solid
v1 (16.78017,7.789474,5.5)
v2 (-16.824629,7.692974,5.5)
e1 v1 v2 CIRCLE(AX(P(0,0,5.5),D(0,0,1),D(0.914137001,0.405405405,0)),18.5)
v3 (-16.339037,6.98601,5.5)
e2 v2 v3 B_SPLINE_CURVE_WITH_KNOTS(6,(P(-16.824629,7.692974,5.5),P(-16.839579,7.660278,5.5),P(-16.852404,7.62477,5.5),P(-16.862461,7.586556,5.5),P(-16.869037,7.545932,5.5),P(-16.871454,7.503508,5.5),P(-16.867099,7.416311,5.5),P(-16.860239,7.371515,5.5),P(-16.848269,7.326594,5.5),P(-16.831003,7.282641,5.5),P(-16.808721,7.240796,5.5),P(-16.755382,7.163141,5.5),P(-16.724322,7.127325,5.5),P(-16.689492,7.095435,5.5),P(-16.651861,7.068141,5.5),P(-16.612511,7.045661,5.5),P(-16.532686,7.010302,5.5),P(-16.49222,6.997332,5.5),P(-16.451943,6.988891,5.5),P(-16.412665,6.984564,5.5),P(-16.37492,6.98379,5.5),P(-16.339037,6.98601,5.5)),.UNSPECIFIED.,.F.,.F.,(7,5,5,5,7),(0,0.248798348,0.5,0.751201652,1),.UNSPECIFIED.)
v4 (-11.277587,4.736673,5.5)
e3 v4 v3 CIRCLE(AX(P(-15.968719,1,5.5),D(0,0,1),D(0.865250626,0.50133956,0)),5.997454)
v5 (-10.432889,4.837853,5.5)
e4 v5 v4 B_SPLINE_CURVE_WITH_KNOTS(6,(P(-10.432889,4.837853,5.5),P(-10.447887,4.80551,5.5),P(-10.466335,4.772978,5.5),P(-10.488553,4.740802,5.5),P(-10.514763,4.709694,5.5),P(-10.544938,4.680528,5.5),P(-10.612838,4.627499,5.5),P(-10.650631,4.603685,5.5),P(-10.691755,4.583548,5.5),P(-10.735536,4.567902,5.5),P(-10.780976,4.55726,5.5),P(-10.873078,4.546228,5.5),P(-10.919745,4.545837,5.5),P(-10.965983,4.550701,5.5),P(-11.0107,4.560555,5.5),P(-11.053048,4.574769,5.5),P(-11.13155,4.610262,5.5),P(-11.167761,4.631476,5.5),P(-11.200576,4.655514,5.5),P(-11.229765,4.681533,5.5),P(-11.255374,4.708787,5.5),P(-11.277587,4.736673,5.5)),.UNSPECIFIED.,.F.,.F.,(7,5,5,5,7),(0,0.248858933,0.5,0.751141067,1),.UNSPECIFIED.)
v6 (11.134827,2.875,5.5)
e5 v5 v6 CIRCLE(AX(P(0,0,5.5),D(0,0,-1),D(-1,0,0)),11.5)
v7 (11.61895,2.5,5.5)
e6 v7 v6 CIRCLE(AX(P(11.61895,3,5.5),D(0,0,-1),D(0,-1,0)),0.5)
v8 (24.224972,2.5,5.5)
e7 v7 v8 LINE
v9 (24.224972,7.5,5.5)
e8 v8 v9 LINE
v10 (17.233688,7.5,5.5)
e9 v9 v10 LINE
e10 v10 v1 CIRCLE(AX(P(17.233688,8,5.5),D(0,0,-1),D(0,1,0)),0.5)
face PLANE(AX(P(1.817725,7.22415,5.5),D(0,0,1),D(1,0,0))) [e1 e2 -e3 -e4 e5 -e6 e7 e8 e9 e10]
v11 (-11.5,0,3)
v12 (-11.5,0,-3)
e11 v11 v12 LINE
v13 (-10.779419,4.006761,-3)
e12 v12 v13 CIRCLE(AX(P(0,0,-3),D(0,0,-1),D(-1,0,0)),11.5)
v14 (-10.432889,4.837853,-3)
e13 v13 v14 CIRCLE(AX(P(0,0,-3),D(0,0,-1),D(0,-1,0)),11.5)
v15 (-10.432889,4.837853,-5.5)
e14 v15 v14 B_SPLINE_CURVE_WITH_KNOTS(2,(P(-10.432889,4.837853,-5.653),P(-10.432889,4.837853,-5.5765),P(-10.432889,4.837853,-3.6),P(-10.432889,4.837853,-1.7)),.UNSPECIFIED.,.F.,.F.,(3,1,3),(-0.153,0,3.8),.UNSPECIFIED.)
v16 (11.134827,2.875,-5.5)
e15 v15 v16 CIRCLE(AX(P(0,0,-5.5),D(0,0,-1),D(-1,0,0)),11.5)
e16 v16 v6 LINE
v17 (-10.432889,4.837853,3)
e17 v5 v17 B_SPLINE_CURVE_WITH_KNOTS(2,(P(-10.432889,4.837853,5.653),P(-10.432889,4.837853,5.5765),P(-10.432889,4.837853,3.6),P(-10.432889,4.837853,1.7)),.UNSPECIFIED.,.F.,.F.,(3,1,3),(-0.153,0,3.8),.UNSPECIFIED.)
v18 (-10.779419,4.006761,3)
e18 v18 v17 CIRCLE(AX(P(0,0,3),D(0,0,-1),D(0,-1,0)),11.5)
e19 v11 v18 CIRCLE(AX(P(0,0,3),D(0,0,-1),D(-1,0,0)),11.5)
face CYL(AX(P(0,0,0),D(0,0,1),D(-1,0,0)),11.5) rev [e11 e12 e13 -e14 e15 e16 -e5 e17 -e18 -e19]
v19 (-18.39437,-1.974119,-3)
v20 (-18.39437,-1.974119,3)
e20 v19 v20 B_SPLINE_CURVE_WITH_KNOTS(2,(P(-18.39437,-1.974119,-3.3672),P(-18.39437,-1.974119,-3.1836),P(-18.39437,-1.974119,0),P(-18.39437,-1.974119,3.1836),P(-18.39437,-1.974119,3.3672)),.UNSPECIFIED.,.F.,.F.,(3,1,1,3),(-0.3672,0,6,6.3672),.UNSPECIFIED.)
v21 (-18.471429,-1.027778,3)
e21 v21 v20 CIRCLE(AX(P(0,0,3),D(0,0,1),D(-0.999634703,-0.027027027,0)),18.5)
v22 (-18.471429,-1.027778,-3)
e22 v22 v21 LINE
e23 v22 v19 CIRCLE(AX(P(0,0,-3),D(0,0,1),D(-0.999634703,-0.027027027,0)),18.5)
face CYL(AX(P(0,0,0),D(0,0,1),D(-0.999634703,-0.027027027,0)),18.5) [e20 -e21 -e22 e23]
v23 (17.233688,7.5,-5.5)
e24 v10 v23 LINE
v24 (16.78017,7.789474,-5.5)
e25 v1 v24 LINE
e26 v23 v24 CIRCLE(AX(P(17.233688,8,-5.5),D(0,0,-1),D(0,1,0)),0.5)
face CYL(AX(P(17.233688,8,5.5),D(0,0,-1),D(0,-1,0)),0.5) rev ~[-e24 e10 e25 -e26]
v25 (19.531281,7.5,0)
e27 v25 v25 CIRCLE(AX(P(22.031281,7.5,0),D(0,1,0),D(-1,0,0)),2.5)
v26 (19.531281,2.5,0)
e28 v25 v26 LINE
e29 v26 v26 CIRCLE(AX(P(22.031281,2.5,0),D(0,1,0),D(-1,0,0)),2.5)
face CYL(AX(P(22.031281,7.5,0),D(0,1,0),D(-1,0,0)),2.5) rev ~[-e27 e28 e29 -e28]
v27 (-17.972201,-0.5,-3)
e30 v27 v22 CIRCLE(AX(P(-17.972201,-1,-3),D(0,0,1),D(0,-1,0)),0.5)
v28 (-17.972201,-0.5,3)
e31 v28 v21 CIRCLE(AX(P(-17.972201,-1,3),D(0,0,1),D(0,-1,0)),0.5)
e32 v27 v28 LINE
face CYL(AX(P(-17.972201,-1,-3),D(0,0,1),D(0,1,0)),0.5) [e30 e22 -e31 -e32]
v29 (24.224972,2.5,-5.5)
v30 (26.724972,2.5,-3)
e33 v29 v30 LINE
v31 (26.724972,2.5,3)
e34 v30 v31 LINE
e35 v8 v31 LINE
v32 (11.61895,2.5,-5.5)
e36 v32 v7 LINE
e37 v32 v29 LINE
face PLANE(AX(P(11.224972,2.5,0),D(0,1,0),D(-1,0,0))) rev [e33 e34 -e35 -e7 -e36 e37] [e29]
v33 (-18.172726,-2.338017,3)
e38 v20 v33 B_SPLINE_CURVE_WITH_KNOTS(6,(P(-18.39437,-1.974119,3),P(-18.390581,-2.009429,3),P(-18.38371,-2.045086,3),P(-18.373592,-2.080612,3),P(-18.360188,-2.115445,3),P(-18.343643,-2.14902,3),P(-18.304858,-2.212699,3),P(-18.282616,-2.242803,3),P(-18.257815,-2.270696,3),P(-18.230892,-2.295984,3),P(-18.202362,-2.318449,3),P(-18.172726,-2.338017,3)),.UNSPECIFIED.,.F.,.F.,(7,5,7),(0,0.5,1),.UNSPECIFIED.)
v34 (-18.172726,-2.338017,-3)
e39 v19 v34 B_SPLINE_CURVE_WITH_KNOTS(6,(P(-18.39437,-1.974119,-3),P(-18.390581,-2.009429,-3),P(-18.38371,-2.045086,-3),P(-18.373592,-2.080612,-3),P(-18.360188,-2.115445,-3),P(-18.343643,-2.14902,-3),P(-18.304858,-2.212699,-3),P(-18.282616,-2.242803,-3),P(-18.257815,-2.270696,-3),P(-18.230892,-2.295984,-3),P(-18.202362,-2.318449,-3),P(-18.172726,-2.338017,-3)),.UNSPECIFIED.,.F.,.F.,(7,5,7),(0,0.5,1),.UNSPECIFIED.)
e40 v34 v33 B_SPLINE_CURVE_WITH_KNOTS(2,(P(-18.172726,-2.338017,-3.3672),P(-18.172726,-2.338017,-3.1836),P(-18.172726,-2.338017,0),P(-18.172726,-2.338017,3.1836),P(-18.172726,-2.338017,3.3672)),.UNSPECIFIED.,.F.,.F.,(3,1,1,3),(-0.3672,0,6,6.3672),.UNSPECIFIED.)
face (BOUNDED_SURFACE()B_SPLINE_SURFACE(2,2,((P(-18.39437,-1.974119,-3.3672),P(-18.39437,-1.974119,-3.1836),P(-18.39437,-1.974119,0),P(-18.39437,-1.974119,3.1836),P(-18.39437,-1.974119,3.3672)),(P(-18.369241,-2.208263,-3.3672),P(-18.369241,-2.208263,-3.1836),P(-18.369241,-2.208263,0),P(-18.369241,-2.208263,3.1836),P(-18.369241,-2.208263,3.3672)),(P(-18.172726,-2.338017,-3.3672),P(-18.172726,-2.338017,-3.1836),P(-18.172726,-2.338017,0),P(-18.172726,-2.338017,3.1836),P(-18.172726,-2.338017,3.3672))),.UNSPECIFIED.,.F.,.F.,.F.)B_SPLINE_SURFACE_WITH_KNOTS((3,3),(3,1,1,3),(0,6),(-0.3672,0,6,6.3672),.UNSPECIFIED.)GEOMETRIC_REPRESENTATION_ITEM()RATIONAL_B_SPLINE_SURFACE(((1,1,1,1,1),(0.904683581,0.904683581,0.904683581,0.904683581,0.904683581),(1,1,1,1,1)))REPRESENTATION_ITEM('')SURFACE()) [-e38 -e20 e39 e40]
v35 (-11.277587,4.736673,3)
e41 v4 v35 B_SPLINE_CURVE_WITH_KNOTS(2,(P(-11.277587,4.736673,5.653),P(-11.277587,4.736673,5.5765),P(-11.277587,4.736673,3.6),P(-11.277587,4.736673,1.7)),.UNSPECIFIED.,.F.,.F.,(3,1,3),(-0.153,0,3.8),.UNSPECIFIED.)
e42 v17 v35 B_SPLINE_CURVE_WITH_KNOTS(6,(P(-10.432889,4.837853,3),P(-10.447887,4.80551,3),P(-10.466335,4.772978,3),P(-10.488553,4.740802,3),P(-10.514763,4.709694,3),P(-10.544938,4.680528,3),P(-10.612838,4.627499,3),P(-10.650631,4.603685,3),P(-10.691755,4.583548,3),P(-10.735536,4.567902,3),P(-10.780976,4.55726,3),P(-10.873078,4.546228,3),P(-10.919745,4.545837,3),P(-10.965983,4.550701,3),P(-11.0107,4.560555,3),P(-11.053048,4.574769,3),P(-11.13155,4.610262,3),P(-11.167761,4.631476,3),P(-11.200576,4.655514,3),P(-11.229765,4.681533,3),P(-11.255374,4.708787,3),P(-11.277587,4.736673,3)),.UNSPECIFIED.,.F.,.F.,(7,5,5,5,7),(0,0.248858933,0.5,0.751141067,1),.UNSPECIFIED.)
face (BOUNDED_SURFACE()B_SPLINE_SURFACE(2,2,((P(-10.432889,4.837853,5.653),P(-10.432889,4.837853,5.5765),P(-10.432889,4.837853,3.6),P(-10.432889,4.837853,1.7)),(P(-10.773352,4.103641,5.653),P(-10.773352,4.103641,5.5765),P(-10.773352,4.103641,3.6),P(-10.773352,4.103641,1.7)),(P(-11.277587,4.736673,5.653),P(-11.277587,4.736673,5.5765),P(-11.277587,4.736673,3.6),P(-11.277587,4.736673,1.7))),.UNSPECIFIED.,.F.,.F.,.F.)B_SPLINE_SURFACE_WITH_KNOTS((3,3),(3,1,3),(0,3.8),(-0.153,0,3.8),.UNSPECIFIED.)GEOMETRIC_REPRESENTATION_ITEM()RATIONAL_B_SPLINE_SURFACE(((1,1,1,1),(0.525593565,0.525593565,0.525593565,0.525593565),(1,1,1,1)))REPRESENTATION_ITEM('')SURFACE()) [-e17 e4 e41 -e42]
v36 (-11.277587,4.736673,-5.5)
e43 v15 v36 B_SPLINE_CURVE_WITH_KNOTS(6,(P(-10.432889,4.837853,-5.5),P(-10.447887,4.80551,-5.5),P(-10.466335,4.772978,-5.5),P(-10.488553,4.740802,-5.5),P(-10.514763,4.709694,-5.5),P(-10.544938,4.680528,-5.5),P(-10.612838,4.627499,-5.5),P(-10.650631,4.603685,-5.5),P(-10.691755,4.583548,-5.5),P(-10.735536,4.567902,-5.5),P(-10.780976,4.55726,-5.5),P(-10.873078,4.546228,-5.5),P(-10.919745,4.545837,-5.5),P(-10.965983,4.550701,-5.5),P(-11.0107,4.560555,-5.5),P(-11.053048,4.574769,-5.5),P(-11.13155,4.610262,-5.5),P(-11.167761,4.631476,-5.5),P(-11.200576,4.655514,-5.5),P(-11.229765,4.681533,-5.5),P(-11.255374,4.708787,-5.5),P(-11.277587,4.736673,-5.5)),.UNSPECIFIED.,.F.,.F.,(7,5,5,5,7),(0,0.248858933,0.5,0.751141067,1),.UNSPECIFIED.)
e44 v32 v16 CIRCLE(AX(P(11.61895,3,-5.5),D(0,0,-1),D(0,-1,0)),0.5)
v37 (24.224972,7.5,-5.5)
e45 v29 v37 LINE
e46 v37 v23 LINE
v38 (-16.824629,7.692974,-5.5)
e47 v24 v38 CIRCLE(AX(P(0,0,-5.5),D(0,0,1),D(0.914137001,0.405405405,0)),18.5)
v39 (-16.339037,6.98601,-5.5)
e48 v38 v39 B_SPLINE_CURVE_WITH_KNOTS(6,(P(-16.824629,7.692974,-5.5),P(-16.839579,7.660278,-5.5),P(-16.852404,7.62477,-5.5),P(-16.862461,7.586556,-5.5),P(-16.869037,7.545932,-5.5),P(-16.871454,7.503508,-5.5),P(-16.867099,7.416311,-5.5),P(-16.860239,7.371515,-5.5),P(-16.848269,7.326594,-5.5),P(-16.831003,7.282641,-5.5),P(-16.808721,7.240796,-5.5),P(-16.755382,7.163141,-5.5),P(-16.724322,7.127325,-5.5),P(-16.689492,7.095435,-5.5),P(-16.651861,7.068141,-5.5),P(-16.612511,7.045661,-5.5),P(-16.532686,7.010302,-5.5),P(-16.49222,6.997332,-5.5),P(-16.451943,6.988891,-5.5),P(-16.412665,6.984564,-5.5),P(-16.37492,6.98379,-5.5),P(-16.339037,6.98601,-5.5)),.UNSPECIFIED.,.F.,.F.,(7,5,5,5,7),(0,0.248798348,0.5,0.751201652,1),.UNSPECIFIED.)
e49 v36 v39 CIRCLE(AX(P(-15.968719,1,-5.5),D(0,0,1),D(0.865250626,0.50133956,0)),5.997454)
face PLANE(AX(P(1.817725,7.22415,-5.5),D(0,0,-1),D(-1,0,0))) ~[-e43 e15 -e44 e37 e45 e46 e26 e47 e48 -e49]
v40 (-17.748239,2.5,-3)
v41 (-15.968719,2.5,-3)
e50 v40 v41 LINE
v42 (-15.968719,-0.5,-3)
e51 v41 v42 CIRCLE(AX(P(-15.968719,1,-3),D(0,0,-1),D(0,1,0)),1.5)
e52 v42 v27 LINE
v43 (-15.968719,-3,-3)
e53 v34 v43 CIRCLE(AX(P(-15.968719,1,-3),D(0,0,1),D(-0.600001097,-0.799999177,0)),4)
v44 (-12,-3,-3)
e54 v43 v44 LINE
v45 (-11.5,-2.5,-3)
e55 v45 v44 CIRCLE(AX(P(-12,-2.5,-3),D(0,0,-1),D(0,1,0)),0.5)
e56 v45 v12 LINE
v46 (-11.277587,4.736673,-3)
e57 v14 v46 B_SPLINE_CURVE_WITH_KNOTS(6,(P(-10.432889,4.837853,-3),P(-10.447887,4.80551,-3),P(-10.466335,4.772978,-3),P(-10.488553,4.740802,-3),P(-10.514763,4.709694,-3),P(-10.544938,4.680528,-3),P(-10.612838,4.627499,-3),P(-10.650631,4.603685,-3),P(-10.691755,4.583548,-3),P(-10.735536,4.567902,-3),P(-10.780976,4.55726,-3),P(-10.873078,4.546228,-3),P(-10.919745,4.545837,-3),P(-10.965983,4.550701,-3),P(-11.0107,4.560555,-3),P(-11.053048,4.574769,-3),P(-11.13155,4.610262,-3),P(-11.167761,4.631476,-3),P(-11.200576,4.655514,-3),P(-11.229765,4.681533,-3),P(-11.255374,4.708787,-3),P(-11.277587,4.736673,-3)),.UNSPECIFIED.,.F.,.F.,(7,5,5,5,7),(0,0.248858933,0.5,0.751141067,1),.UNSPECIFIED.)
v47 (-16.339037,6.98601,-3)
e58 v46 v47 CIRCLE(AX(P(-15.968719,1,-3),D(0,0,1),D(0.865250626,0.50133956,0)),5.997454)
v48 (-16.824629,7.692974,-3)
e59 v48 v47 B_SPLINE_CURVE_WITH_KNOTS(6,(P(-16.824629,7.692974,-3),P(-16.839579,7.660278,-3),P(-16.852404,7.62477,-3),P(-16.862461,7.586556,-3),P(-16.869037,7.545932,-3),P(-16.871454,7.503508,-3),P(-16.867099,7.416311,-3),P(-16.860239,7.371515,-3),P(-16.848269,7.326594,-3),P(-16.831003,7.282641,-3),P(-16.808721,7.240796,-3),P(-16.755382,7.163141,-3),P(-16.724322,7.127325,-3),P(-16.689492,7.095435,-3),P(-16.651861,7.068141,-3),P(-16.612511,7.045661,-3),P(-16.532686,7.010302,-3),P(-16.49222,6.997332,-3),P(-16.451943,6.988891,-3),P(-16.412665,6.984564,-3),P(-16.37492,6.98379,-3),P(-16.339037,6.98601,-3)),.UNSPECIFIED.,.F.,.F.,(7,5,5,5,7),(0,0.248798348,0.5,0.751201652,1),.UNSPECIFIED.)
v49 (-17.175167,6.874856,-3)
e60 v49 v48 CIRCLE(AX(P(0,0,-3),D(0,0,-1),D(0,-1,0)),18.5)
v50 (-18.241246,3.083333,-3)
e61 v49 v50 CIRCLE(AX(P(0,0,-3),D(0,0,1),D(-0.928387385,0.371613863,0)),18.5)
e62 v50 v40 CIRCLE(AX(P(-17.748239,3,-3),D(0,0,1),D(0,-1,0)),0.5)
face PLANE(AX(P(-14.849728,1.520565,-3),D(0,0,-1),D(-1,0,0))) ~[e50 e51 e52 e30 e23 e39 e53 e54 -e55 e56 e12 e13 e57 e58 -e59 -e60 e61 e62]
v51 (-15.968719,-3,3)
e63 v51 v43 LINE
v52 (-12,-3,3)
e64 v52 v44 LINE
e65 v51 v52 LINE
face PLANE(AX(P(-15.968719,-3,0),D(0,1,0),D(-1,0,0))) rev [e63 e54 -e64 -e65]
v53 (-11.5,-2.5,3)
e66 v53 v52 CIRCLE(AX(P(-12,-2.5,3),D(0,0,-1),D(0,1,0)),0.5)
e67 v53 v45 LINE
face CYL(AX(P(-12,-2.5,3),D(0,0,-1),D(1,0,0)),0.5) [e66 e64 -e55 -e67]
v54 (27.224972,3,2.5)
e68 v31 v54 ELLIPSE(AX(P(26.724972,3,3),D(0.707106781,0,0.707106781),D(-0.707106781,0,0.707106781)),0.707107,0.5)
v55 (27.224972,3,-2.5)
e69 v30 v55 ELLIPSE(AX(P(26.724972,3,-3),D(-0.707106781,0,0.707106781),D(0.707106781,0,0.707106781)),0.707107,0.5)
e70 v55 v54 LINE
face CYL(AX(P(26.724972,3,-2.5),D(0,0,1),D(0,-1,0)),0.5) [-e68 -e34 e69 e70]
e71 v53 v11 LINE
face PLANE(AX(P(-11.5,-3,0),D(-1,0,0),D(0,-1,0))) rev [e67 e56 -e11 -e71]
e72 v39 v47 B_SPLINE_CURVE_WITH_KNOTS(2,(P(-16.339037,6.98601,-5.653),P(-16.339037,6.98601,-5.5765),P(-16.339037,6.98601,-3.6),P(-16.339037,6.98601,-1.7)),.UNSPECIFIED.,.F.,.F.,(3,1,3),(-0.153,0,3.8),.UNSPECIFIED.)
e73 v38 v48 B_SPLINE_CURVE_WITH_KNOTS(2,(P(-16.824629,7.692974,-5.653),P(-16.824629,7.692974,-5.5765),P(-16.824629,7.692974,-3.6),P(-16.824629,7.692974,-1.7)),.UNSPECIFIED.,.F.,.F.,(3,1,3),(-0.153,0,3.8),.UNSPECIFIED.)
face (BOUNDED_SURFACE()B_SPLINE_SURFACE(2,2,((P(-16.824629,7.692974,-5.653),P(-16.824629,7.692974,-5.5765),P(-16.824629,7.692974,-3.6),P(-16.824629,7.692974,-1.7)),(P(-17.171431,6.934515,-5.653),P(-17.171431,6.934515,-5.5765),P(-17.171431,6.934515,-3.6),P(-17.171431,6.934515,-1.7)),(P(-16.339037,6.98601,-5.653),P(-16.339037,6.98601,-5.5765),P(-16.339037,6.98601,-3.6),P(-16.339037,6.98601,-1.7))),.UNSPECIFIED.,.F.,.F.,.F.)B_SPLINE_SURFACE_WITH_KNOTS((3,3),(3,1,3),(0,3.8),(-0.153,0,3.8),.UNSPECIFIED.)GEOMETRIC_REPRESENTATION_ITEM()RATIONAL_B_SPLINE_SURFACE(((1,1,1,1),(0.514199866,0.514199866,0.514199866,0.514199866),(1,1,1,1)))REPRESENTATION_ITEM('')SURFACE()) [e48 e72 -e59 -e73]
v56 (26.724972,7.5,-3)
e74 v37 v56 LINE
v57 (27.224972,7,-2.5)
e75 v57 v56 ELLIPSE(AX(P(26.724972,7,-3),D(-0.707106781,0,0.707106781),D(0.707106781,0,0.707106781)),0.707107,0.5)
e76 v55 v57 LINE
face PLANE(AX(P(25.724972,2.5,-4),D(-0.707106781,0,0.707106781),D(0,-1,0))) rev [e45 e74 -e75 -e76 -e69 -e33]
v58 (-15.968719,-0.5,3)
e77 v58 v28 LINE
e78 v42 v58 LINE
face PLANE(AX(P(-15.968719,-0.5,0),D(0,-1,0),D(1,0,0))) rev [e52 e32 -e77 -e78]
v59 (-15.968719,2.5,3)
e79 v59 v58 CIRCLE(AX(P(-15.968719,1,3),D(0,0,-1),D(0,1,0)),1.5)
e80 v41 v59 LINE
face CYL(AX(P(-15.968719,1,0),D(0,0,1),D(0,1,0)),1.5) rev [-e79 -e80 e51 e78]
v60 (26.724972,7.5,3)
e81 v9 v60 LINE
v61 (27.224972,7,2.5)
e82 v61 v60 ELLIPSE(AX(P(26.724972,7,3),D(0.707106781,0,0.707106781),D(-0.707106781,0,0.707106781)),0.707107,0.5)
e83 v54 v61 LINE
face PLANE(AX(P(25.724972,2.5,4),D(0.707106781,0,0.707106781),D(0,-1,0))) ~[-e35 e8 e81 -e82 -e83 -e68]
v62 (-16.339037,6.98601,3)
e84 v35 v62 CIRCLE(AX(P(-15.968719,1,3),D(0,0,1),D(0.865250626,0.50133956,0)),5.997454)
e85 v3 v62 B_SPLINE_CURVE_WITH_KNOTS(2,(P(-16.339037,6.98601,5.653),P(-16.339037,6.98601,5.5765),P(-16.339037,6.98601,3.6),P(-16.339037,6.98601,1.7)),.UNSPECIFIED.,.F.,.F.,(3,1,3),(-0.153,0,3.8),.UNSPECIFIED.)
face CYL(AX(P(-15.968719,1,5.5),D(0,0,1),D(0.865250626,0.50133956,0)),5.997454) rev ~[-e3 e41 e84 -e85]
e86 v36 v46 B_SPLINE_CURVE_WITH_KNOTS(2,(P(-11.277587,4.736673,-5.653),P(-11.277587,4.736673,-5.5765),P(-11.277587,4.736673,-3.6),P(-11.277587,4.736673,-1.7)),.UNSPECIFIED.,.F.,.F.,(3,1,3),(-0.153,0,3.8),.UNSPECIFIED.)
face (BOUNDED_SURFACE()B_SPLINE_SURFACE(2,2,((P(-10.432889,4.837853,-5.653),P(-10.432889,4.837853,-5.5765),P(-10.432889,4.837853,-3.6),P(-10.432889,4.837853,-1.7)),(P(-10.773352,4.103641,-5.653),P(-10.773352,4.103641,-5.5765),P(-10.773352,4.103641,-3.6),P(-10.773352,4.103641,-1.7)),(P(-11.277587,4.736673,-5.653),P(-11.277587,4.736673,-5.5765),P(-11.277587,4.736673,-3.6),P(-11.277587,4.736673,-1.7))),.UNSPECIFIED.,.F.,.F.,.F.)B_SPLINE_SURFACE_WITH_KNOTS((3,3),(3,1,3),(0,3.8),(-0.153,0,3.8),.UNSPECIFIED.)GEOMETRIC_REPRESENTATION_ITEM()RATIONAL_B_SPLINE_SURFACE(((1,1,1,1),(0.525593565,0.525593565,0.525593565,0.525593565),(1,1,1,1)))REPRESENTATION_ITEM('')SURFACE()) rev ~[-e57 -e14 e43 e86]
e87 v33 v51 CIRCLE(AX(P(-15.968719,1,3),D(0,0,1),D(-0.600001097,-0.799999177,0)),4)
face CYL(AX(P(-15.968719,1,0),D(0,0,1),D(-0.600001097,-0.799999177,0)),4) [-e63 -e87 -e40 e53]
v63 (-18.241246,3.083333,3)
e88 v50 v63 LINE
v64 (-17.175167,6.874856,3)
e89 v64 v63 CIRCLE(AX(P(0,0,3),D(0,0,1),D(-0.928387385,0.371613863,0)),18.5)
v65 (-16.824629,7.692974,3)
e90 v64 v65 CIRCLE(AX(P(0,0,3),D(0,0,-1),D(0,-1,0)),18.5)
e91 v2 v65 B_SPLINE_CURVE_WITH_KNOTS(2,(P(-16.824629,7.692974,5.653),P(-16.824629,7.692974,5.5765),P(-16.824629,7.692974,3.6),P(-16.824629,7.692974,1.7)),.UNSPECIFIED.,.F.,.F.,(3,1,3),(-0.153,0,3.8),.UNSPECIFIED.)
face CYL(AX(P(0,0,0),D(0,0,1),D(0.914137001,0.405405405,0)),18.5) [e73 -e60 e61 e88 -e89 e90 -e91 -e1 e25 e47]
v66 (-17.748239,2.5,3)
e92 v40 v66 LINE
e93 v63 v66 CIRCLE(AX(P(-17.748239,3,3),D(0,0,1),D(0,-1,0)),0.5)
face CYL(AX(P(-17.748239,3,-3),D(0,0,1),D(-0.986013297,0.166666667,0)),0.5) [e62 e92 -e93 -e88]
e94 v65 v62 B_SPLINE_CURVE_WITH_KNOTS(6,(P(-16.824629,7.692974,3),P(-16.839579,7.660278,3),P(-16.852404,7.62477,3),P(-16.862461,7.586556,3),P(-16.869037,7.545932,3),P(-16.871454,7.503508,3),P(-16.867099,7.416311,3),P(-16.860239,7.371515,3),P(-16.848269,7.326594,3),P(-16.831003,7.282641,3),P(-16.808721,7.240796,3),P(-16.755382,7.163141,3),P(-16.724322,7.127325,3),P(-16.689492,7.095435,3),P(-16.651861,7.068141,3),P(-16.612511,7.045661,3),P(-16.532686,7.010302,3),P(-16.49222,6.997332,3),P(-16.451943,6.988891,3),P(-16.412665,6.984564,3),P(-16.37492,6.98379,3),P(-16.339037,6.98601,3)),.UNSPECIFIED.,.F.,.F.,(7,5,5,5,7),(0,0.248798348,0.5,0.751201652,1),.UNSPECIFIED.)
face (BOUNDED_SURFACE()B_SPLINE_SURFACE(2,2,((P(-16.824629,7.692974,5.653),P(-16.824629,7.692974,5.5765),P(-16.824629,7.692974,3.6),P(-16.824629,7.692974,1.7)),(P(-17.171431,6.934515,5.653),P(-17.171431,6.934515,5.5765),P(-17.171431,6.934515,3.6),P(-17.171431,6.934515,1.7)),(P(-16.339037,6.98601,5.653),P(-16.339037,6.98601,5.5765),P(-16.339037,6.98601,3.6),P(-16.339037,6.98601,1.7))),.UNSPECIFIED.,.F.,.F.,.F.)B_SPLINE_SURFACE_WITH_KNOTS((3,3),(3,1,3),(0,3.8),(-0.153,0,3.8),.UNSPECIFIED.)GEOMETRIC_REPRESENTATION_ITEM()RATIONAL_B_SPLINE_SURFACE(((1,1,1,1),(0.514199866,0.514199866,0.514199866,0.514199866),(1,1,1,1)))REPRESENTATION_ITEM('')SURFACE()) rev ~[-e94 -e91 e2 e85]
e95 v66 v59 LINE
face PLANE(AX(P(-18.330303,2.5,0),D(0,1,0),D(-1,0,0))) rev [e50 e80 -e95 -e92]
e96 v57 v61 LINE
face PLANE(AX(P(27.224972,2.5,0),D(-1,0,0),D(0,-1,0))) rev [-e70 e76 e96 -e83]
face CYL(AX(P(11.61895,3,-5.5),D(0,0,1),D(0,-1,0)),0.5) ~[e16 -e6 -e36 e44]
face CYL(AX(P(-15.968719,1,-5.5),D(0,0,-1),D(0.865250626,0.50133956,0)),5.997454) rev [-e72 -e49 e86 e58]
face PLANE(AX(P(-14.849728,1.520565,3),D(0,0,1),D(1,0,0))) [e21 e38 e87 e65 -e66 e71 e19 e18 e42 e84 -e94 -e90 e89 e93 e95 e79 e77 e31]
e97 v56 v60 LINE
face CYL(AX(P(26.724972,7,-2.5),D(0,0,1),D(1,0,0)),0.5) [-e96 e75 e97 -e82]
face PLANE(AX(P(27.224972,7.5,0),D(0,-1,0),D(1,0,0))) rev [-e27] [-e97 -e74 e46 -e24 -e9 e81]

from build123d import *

# Parameters (mm, degrees)
F1_DEPTH = 5.5
F3_DEPTH = 2.5
F5_R     = 2.5
F6_DEPTH = 5
F7_SIZE  = 3
F8_R     = 0.5


# Not quite as in the source:
# - a feature names something its author has since deleted; it is built from what else it names


with BuildPart() as f1:
    # F0 (on Top) → F1 (new body)
    with BuildSketch(Plane.XY):
        with BuildLine():
            ThreePointArc((-11.5, 0), (-1.2575412829, 11.4310362576), (11.2249721603, 2.5))
            Line((11.2249721603, 2.5), (27.2249721603, 2.5))
            Line((27.2249721603, 2.5), (27.2249721603, 7.5))
            Line((27.2249721603, 7.5), (16.9115345253, 7.5))
            ThreePointArc((16.9115345253, 7.5), (-2.5986969504, 18.3165710263), (-18.3303027798, 2.5))
            Line((-18.3303027798, 2.5), (-15.9687194227, 2.5))
            ThreePointArc((-15.9687194227, 2.5), (-14.4687194227, 1), (-15.9687194227, -0.5))
            Line((-15.9687194227, -0.5), (-18.4932420089, -0.5))
            ThreePointArc((-18.4932420089, -0.5), (-18.4505725724, -1.3514332211), (-18.3687238121, -2.1999967079))
            ThreePointArc((-18.3687238121, -2.1999967079), (-17.2336330893, -2.7947323247), (-15.9687194227, -3))
            Line((-15.9687194227, -3), (-11.5, -3))
            Line((-11.5, -3), (-11.5, 0))
        make_face()
    extrude(amount=F1_DEPTH)

    # F2 (on face) → F3 (cut)
    with BuildSketch(Plane.XY.offset(5.5)):
        with BuildLine():
            Line((-15.9687194227, -3), (-11.5, -3))
            Line((-11.5, -3), (-11.5, 0))
            ThreePointArc((-11.5, 0), (-11.3184211539, 2.0355202239), (-10.7794186814, 4.0067608976))
            ThreePointArc((-10.7794186814, 4.0067608976), (-13.5146873094, 6.472401636), (-17.1751666268, 6.8748564597))
            ThreePointArc((-17.1751666268, 6.8748564597), (-17.8869905716, 4.7228771203), (-18.3303027798, 2.5))
            Line((-18.3303027798, 2.5), (-15.9687194227, 2.5))
            ThreePointArc((-15.9687194227, 2.5), (-14.4687194227, 1), (-15.9687194227, -0.5))
            Line((-15.9687194227, -0.5), (-18.4932420089, -0.5))
            ThreePointArc((-18.4932420089, -0.5), (-18.4505725724, -1.3514332211), (-18.3687238121, -2.1999967079))
            ThreePointArc((-18.3687238121, -2.1999967079), (-17.2336330893, -2.7947323247), (-15.9687194227, -3))
        make_face()
    extrude(amount=-F3_DEPTH, mode=Mode.SUBTRACT)

    # F4: F1 across plane


with BuildPart() as f1_1:
    add(f1.part)
    add(f1.part.mirror(Plane.XY))

    # F5 (on face) → F6 (cut, through all)
    with BuildSketch(Plane(origin=(0, 7.5, 0), x_dir=(-1, 0, 0), z_dir=(0, 1, 0))):
        with Locations((-22.0312805773, 0)):
            Circle(F5_R)
    extrude(amount=-F6_DEPTH, mode=Mode.SUBTRACT)

    # F7
    f7_edges = [f1_1.edges().sort_by_distance(p)[0] for p in [
        (27.224972, 5, 5.5),
        (27.224972, 5, -5.5),
    ]]
    chamfer(f7_edges, length=F7_SIZE)

    # F8
    f8_edges = [f1_1.edges().sort_by_distance(p)[0] for p in [
        (-11.5, -3, 0),
        (-10.779419, 4.006761, 4.25),
        (-10.779419, 4.006761, -4.25),
        (-17.175167, 6.874856, 4.25),
        (-17.175167, 6.874856, -4.25),
        (-18.368724, -2.199997, 0),
        (-18.493242, -0.5, 0),
        (-18.330303, 2.5, 0),
        (11.224972, 2.5, 0),
        (16.911535, 7.5, 0),
        (27.224972, 2.5, 0),
        (27.224972, 7.5, 0),
    ]]
    fillet(f8_edges, radius=F8_R)


solid = f1_1.part
